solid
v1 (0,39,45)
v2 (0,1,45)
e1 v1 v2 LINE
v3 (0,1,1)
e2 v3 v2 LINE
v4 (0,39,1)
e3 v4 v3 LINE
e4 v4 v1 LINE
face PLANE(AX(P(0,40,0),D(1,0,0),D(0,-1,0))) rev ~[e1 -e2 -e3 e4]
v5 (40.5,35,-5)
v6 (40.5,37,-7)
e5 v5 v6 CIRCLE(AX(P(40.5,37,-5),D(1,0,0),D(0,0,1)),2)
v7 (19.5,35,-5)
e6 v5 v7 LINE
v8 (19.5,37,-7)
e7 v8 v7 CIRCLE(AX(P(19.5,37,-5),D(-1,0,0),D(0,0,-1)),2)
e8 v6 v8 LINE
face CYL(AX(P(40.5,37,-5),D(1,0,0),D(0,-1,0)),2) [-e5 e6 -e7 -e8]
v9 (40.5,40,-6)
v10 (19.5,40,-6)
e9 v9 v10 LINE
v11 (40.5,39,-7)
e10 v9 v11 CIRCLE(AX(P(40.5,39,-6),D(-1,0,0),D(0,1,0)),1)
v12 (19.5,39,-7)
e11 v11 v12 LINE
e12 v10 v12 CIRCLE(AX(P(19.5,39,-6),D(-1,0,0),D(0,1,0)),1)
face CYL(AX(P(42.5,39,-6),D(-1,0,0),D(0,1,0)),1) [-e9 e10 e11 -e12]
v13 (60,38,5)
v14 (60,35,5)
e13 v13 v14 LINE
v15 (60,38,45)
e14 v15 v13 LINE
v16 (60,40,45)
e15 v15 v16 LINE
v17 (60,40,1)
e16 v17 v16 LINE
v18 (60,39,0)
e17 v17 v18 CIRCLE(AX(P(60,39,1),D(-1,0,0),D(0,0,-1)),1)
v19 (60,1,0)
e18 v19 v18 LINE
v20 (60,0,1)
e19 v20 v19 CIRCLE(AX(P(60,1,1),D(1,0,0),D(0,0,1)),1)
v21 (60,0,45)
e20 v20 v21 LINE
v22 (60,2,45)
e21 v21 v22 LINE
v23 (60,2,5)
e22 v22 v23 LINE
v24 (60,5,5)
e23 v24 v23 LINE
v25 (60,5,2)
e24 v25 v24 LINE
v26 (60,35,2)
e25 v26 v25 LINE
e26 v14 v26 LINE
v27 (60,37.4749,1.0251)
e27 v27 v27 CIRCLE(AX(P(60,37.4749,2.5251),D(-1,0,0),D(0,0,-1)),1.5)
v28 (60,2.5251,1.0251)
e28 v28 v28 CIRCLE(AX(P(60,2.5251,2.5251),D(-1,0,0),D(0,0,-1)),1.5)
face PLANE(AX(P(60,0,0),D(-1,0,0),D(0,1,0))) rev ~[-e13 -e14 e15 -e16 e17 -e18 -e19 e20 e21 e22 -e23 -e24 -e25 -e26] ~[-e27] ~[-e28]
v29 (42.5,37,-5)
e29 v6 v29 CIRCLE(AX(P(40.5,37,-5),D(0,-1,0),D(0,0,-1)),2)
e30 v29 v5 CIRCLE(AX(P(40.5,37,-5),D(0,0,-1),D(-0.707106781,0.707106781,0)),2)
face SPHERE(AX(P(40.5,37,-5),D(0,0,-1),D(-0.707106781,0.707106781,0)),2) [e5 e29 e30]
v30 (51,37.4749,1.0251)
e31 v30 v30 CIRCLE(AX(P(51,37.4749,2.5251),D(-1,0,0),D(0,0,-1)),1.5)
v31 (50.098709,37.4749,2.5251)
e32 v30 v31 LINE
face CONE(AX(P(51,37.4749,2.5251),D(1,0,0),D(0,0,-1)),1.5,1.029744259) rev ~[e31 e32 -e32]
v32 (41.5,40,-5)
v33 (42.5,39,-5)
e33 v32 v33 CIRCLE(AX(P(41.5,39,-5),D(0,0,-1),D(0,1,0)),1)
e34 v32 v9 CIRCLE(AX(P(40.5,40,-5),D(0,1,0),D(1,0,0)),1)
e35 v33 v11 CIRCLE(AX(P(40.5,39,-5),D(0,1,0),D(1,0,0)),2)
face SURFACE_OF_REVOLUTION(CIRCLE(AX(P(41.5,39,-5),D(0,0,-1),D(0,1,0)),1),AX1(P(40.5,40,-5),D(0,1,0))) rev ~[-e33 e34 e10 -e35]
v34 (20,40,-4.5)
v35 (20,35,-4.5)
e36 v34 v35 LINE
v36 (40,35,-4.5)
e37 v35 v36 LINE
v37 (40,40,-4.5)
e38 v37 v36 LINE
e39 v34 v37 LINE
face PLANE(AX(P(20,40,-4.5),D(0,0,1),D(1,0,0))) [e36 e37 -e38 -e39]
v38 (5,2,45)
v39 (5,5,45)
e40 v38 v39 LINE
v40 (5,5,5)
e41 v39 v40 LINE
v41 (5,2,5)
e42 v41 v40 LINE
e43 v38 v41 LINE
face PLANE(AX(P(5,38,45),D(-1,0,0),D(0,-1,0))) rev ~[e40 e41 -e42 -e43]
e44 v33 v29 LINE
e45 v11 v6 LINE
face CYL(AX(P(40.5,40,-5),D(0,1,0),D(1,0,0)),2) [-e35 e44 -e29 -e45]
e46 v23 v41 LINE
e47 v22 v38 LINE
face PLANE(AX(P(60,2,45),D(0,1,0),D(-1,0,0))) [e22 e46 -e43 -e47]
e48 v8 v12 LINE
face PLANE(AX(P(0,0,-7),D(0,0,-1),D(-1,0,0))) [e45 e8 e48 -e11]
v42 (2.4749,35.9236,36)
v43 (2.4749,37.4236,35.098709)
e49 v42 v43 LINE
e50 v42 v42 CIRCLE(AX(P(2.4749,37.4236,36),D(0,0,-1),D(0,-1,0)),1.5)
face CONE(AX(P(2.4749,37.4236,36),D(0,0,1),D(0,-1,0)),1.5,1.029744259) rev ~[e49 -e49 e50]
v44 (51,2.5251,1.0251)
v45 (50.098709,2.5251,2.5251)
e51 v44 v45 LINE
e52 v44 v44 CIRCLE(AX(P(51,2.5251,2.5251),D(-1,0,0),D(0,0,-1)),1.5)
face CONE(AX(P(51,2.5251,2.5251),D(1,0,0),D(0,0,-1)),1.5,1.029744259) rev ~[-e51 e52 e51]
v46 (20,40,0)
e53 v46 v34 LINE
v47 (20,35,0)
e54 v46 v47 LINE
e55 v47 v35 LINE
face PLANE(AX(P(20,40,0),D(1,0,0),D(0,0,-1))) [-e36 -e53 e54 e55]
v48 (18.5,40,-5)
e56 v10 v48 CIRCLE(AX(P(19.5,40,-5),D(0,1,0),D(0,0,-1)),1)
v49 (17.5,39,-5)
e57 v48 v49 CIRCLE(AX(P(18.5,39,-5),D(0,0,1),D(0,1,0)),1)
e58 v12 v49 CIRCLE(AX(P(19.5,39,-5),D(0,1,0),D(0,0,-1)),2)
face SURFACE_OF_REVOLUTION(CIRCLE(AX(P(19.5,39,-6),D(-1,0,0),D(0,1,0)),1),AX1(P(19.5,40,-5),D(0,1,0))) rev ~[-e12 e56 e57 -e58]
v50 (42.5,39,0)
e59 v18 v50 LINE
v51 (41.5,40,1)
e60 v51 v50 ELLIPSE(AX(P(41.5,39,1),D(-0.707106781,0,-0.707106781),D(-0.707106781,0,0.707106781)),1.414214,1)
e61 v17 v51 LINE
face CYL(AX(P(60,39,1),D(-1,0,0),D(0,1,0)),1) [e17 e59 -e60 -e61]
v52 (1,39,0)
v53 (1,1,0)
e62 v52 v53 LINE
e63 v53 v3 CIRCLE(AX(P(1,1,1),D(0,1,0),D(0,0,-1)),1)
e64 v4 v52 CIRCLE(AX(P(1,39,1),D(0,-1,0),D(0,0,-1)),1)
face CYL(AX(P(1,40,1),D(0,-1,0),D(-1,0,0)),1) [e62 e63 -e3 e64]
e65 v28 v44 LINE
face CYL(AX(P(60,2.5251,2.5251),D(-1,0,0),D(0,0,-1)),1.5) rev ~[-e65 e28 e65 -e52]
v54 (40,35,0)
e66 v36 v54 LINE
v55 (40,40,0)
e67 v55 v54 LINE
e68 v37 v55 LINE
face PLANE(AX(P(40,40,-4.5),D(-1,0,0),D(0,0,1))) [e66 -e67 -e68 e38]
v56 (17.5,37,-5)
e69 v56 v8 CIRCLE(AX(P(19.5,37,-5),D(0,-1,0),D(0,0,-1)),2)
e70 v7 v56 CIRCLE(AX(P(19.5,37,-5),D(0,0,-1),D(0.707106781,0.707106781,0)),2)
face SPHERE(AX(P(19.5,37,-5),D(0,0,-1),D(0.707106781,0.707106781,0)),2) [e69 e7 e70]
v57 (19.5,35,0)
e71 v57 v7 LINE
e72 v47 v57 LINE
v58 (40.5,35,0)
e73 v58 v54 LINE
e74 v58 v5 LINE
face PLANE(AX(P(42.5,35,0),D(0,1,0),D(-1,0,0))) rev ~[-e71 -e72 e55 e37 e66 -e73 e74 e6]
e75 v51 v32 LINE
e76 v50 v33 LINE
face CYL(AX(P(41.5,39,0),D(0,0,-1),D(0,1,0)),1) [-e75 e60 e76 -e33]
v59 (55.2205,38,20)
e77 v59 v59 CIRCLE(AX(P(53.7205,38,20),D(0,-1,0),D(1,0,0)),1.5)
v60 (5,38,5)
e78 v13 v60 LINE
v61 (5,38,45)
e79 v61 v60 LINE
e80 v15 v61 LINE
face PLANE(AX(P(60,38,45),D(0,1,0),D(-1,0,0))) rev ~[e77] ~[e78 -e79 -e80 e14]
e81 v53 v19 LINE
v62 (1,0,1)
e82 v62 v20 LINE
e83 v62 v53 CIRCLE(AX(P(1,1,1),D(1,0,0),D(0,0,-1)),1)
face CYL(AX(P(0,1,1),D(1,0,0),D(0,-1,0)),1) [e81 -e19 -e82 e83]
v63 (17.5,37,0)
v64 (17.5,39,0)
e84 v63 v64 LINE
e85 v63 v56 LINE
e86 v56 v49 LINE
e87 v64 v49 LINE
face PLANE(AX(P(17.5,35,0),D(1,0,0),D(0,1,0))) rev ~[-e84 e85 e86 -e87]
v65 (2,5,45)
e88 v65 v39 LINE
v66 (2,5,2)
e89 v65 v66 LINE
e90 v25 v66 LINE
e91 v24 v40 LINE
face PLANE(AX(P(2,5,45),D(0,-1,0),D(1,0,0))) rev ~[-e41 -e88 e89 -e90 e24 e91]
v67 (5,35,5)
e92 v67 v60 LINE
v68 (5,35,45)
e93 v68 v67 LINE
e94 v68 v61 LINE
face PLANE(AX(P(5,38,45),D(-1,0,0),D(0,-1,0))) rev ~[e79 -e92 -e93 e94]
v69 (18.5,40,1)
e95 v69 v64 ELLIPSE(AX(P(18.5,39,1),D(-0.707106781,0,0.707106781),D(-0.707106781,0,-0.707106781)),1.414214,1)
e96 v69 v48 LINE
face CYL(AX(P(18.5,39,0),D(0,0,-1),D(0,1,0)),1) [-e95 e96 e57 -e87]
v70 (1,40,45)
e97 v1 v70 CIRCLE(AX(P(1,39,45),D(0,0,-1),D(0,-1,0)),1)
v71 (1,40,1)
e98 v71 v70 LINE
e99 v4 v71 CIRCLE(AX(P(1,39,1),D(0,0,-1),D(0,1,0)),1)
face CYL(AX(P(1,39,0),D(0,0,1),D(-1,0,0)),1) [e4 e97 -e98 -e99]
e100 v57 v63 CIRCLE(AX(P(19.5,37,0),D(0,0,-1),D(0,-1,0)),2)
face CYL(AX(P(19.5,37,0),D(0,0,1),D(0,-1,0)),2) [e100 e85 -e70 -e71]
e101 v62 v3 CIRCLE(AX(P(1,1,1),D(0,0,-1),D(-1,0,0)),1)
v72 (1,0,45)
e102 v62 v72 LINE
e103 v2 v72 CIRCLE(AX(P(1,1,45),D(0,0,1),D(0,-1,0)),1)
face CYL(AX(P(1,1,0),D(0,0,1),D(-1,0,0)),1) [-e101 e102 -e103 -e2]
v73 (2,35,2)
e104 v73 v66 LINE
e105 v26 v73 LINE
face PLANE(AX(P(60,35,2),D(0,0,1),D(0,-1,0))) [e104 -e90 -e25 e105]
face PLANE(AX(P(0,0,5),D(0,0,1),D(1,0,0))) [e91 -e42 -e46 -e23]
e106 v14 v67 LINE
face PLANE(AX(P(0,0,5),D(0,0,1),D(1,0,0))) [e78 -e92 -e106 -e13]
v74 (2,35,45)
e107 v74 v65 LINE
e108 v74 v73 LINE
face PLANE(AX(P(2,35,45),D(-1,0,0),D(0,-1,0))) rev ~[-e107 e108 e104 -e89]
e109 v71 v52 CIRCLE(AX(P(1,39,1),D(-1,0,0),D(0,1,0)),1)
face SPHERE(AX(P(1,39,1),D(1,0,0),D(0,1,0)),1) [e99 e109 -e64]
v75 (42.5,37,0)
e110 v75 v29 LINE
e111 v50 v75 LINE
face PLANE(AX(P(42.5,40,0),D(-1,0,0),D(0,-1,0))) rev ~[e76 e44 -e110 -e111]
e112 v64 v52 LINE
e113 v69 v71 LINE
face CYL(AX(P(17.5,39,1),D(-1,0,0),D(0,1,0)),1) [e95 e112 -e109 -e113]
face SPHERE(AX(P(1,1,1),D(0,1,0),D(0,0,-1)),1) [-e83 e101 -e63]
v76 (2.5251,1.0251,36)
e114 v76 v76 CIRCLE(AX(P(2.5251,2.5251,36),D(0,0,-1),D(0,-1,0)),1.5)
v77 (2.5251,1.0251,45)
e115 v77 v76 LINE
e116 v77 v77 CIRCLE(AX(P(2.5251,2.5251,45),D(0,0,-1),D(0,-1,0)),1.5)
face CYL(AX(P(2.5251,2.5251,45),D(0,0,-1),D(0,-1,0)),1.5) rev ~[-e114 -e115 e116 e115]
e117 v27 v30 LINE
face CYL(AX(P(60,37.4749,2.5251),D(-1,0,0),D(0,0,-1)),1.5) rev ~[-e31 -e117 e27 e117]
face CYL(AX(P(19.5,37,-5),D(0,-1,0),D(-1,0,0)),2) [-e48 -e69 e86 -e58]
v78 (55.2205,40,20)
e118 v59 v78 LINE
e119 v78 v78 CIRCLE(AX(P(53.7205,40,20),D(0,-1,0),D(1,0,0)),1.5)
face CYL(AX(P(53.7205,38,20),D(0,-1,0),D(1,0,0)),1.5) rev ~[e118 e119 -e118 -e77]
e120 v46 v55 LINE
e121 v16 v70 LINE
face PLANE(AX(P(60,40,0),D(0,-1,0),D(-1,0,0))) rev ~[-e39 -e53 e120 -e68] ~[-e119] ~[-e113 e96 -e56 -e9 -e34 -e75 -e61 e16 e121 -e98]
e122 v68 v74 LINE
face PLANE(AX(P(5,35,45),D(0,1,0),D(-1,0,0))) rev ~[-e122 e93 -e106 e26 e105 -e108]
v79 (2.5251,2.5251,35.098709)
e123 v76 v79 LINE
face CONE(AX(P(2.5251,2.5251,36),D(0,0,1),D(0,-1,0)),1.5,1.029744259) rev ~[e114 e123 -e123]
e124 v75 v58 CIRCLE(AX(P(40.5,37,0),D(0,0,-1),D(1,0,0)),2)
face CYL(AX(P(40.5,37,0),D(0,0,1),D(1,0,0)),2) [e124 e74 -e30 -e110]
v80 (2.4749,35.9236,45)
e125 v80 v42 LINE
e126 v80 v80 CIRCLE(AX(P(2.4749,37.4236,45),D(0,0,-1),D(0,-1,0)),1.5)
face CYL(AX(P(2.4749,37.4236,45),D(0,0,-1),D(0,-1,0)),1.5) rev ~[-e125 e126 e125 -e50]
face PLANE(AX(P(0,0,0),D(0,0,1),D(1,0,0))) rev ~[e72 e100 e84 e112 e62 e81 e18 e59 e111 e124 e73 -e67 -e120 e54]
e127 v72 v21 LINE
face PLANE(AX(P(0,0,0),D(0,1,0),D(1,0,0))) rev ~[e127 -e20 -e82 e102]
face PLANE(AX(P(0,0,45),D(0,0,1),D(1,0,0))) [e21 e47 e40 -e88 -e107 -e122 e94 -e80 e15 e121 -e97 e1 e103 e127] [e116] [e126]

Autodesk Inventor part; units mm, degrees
ref_plane "YZ Plane" through (0, 0, 0) normal (1, 0, 0) x (0, 1, 0)
ref_plane "XZ Plane" through (0, 0, 0) normal (0, 1, 0) x (-1, 0, 0)
ref_plane "XY Plane" through (0, 0, 0) normal (0, 0, 1) x (1, 0, 0)
sketch "Sketch2" plane through (0, 0, 0) normal (0, 0, 1) x (1, 0, 0)
  line L0 (0, 0) -> (60, 0)
  line L1 (60, 0) -> (60, 40)
  line L2 (60, 40) -> (0, 40)
  line L3 (0, 40) -> (0, 0)
  dimension "d11" = 60
  dimension "d12" = 40
extrude "Extrusion1" add sketch "Sketch2" along normal blind 45
shell "Shell1" thickness 5 removed faces 2 at (20, 26.6667, 45) at (60, 13.3333, 30)
sketch "Sketch4" plane through (0, 0, 45) normal (0, 0, 1) x (1, 0, 0)
  line L0 (5, 35) -> (5, 5) projected
  circle A0 centre (2.4749, 37.4236) radius 2
  circle A1 centre (2.4749, 2.5764) radius 2
  point P0 (0, 0)
  dimension "d20" = 4
  dimension "d21" = 4
hole "Hole2" at (2.4749, 37.4236, 45) direction (0, 0, -1) diameter 3 depth 9 tip angle 118
sketch "Sketch6" plane through (0, 0, 45) normal (0, 0, 1) x (1, 0, 0)
  line L0 (5, 35) -> (5, 5) projected
  circle A0 centre (2.5251, 2.5251) radius 2
  point P0 (0, 0)
  dimension "d37" = 4
hole "Hole3" at (2.5251, 2.5251, 45) direction (0, 0, -1) diameter 3 depth 9 tip angle 118
sketch "Sketch7" plane through (60, 0, 0) normal (1, 0, 0) x (0, 0, -1)
  line L0 (-5, 35) -> (-45, 35) projected
  circle A0 centre (-2.5251, 37.4749) radius 2
  point P0 (0, 0)
  dimension "d46" = 4
hole "Hole4" at (60, 37.4749, 2.5251) direction (-1, 0, 0) diameter 3 depth 9 tip angle 118
sketch "Sketch8" plane through (60, 0, 0) normal (1, 0, 0) x (0, 0, -1)
  line L0 (-5, 35) -> (-5, 5) projected
  circle A0 centre (-2.5251, 2.5251) radius 2
  point P0 (0, 0)
  dimension "d55" = 4
hole "Hole5" at (60, 2.5251, 2.5251) direction (-1, 0, 0) diameter 3 depth 9 tip angle 118
sketch "Sketch11" plane through (0, 0, 45) normal (0, 0, 1) x (1, 0, 0)
  line L0 (60, 35) -> (5, 35) projected
  line L1 (60, 38.9749) -> (60, 35.9749) projected
  line L2 (5, 35) -> (60, 35)
  line L3 (60, 35) -> (60, 38)
  line L4 (60, 38) -> (5, 38)
  line L5 (5, 38) -> (5, 35)
  point P0 (0, 0)
  dimension "d76" = 3
extrude "Extrusion4" cut sketch "Sketch11" against normal blind 40
sketch "Sketch12" plane through (0, 0, 45) normal (0, 0, 1) x (1, 0, 0)
  line L0 (5, 38) -> (5, 5) projected
  line L1 (60, 4.0251) -> (60, 1.0251) projected
  line L2 (5, 5) -> (60, 5)
  line L3 (60, 5) -> (60, 2)
  line L4 (60, 2) -> (5, 2)
  line L5 (5, 2) -> (5, 5)
  point P0 (0, 0)
  dimension "d79" = 3
extrude "Extrusion5" cut sketch "Sketch12" against normal blind 40
sketch "Sketch13" plane through (0, 0, 45) normal (0, 0, 1) x (1, 0, 0)
  line L0 (5, 38) -> (60, 38) projected
  line L1 (5, 38) -> (5, 35)
  line L2 (5, 2) -> (5, 38) projected
  line L3 (5, 35) -> (2, 35)
  line L4 (2, 35) -> (2, 5)
  line L5 (2, 5) -> (5, 5)
  line L6 (5, 5) -> (5, 35)
  point P0 (0, 0)
  dimension "d82" = 3
  dimension "d83" = 3
  dimension "d84" = 30
extrude "Extrusion6" cut sketch "Sketch13" against normal blind 40
sketch "Sketch14" plane through (60, 0, 0) normal (1, 0, 0) x (0, 0, -1)
  line L0 (-5, 38) -> (-5, 2) projected
  line L1 (-5, 38) -> (-5, 35)
  line L2 (-5, 35) -> (-2, 35)
  line L3 (-2, 35) -> (-2, 5)
  line L4 (-2, 5) -> (-5, 5)
  line L5 (-5, 5) -> (-5, 35)
  point P0 (0, 0)
  dimension "d87" = 3
  dimension "d88" = 3
  dimension "d89" = 30
extrude "Extrusion7" cut sketch "Sketch14" against normal blind 58
sketch "Sketch18" plane through (5, 38, 45) normal (0, -1, 0) x (1, 0, 0)
  line L0 (0, -40) -> (55, -40) projected
  line L1 (55, -40) -> (55, -25)
  line L2 (55, 0) -> (55, -40) projected
  line L3 (55, -25) -> (49, -25)
  circle A0 centre (48.7205, -25) radius 1.5
  point P0 (-5, -45)
  dimension "d108" = 15
  dimension "d109" = 6
  dimension "d110" = 3
extrude "Extrusion10" cut sketch "Sketch18" against normal blind 2
sketch "Sketch19" plane through (0, 0, 0) normal (0, 0, -1) x (-1, 0, 0)
  line L0 (0, 0) -> (0, 40)
  line L1 (0, 40) -> (-30, 40)
  line L2 (-2, 40) -> (-60, 40) projected
  line L3 (-30, 40) -> (-17.5, 40)
  line L4 (-17.5, 40) -> (-42.5, 40)
  line L5 (-42.5, 40) -> (-42.5, 35)
  line L6 (-42.5, 35) -> (-17.5, 35)
  line L7 (-17.5, 35) -> (-17.5, 40)
  dimension "d113" = 40
  dimension "d114" = 30
  dimension "d115" = 12.5
  dimension "d116" = 25
  dimension "d117" = 5
extrude "Extrusion11" add sketch "Sketch19" along normal blind 7
sketch "Sketch20" plane through (0, 40, 45) normal (0, 1, 0) x (1, 0, 0)
  line L0 (42.5, 45) -> (40, 45)
  line L1 (17.5, 45) -> (42.5, 45) projected
  line L2 (40, 45) -> (20, 45)
  line L3 (20, 45) -> (20, 49.5)
  line L4 (20, 49.5) -> (40, 49.5)
  line L5 (40, 49.5) -> (40, 45)
  point P0 (0, 45)
  dimension "d120" = 2.5
  dimension "d121" = 20
  dimension "d122" = 4.5
extrude "Extrusion12" cut sketch "Sketch20" against normal blind 5
fillet "Fillet3" radius 1 9 edges at (51.25, 40, 0) (42.5, 40, -3.5) (30, 40, -7) (17.5, 40, -3.5) (8.75, 40, 0) (0, 40, 22.5) (0, 20, 0) (30, 0, 0) (0, 0, 22.5)
fillet "Fillet4" radius 2 7 edges at (42.2071, 39.7071, -6.7071) (42.5, 37, -7) (30, 35, -7) (17.5, 37, -7) (17.7929, 39.7071, -6.7071) (42.5, 35, -3.5) (17.5, 35, -3.5)
sketch "Sketch21" plane through (1, 40, 45) normal (0, 1, 0) x (1, 0, 0)
  point P0 (-1, 45)
properties material "ABS Plastic"
